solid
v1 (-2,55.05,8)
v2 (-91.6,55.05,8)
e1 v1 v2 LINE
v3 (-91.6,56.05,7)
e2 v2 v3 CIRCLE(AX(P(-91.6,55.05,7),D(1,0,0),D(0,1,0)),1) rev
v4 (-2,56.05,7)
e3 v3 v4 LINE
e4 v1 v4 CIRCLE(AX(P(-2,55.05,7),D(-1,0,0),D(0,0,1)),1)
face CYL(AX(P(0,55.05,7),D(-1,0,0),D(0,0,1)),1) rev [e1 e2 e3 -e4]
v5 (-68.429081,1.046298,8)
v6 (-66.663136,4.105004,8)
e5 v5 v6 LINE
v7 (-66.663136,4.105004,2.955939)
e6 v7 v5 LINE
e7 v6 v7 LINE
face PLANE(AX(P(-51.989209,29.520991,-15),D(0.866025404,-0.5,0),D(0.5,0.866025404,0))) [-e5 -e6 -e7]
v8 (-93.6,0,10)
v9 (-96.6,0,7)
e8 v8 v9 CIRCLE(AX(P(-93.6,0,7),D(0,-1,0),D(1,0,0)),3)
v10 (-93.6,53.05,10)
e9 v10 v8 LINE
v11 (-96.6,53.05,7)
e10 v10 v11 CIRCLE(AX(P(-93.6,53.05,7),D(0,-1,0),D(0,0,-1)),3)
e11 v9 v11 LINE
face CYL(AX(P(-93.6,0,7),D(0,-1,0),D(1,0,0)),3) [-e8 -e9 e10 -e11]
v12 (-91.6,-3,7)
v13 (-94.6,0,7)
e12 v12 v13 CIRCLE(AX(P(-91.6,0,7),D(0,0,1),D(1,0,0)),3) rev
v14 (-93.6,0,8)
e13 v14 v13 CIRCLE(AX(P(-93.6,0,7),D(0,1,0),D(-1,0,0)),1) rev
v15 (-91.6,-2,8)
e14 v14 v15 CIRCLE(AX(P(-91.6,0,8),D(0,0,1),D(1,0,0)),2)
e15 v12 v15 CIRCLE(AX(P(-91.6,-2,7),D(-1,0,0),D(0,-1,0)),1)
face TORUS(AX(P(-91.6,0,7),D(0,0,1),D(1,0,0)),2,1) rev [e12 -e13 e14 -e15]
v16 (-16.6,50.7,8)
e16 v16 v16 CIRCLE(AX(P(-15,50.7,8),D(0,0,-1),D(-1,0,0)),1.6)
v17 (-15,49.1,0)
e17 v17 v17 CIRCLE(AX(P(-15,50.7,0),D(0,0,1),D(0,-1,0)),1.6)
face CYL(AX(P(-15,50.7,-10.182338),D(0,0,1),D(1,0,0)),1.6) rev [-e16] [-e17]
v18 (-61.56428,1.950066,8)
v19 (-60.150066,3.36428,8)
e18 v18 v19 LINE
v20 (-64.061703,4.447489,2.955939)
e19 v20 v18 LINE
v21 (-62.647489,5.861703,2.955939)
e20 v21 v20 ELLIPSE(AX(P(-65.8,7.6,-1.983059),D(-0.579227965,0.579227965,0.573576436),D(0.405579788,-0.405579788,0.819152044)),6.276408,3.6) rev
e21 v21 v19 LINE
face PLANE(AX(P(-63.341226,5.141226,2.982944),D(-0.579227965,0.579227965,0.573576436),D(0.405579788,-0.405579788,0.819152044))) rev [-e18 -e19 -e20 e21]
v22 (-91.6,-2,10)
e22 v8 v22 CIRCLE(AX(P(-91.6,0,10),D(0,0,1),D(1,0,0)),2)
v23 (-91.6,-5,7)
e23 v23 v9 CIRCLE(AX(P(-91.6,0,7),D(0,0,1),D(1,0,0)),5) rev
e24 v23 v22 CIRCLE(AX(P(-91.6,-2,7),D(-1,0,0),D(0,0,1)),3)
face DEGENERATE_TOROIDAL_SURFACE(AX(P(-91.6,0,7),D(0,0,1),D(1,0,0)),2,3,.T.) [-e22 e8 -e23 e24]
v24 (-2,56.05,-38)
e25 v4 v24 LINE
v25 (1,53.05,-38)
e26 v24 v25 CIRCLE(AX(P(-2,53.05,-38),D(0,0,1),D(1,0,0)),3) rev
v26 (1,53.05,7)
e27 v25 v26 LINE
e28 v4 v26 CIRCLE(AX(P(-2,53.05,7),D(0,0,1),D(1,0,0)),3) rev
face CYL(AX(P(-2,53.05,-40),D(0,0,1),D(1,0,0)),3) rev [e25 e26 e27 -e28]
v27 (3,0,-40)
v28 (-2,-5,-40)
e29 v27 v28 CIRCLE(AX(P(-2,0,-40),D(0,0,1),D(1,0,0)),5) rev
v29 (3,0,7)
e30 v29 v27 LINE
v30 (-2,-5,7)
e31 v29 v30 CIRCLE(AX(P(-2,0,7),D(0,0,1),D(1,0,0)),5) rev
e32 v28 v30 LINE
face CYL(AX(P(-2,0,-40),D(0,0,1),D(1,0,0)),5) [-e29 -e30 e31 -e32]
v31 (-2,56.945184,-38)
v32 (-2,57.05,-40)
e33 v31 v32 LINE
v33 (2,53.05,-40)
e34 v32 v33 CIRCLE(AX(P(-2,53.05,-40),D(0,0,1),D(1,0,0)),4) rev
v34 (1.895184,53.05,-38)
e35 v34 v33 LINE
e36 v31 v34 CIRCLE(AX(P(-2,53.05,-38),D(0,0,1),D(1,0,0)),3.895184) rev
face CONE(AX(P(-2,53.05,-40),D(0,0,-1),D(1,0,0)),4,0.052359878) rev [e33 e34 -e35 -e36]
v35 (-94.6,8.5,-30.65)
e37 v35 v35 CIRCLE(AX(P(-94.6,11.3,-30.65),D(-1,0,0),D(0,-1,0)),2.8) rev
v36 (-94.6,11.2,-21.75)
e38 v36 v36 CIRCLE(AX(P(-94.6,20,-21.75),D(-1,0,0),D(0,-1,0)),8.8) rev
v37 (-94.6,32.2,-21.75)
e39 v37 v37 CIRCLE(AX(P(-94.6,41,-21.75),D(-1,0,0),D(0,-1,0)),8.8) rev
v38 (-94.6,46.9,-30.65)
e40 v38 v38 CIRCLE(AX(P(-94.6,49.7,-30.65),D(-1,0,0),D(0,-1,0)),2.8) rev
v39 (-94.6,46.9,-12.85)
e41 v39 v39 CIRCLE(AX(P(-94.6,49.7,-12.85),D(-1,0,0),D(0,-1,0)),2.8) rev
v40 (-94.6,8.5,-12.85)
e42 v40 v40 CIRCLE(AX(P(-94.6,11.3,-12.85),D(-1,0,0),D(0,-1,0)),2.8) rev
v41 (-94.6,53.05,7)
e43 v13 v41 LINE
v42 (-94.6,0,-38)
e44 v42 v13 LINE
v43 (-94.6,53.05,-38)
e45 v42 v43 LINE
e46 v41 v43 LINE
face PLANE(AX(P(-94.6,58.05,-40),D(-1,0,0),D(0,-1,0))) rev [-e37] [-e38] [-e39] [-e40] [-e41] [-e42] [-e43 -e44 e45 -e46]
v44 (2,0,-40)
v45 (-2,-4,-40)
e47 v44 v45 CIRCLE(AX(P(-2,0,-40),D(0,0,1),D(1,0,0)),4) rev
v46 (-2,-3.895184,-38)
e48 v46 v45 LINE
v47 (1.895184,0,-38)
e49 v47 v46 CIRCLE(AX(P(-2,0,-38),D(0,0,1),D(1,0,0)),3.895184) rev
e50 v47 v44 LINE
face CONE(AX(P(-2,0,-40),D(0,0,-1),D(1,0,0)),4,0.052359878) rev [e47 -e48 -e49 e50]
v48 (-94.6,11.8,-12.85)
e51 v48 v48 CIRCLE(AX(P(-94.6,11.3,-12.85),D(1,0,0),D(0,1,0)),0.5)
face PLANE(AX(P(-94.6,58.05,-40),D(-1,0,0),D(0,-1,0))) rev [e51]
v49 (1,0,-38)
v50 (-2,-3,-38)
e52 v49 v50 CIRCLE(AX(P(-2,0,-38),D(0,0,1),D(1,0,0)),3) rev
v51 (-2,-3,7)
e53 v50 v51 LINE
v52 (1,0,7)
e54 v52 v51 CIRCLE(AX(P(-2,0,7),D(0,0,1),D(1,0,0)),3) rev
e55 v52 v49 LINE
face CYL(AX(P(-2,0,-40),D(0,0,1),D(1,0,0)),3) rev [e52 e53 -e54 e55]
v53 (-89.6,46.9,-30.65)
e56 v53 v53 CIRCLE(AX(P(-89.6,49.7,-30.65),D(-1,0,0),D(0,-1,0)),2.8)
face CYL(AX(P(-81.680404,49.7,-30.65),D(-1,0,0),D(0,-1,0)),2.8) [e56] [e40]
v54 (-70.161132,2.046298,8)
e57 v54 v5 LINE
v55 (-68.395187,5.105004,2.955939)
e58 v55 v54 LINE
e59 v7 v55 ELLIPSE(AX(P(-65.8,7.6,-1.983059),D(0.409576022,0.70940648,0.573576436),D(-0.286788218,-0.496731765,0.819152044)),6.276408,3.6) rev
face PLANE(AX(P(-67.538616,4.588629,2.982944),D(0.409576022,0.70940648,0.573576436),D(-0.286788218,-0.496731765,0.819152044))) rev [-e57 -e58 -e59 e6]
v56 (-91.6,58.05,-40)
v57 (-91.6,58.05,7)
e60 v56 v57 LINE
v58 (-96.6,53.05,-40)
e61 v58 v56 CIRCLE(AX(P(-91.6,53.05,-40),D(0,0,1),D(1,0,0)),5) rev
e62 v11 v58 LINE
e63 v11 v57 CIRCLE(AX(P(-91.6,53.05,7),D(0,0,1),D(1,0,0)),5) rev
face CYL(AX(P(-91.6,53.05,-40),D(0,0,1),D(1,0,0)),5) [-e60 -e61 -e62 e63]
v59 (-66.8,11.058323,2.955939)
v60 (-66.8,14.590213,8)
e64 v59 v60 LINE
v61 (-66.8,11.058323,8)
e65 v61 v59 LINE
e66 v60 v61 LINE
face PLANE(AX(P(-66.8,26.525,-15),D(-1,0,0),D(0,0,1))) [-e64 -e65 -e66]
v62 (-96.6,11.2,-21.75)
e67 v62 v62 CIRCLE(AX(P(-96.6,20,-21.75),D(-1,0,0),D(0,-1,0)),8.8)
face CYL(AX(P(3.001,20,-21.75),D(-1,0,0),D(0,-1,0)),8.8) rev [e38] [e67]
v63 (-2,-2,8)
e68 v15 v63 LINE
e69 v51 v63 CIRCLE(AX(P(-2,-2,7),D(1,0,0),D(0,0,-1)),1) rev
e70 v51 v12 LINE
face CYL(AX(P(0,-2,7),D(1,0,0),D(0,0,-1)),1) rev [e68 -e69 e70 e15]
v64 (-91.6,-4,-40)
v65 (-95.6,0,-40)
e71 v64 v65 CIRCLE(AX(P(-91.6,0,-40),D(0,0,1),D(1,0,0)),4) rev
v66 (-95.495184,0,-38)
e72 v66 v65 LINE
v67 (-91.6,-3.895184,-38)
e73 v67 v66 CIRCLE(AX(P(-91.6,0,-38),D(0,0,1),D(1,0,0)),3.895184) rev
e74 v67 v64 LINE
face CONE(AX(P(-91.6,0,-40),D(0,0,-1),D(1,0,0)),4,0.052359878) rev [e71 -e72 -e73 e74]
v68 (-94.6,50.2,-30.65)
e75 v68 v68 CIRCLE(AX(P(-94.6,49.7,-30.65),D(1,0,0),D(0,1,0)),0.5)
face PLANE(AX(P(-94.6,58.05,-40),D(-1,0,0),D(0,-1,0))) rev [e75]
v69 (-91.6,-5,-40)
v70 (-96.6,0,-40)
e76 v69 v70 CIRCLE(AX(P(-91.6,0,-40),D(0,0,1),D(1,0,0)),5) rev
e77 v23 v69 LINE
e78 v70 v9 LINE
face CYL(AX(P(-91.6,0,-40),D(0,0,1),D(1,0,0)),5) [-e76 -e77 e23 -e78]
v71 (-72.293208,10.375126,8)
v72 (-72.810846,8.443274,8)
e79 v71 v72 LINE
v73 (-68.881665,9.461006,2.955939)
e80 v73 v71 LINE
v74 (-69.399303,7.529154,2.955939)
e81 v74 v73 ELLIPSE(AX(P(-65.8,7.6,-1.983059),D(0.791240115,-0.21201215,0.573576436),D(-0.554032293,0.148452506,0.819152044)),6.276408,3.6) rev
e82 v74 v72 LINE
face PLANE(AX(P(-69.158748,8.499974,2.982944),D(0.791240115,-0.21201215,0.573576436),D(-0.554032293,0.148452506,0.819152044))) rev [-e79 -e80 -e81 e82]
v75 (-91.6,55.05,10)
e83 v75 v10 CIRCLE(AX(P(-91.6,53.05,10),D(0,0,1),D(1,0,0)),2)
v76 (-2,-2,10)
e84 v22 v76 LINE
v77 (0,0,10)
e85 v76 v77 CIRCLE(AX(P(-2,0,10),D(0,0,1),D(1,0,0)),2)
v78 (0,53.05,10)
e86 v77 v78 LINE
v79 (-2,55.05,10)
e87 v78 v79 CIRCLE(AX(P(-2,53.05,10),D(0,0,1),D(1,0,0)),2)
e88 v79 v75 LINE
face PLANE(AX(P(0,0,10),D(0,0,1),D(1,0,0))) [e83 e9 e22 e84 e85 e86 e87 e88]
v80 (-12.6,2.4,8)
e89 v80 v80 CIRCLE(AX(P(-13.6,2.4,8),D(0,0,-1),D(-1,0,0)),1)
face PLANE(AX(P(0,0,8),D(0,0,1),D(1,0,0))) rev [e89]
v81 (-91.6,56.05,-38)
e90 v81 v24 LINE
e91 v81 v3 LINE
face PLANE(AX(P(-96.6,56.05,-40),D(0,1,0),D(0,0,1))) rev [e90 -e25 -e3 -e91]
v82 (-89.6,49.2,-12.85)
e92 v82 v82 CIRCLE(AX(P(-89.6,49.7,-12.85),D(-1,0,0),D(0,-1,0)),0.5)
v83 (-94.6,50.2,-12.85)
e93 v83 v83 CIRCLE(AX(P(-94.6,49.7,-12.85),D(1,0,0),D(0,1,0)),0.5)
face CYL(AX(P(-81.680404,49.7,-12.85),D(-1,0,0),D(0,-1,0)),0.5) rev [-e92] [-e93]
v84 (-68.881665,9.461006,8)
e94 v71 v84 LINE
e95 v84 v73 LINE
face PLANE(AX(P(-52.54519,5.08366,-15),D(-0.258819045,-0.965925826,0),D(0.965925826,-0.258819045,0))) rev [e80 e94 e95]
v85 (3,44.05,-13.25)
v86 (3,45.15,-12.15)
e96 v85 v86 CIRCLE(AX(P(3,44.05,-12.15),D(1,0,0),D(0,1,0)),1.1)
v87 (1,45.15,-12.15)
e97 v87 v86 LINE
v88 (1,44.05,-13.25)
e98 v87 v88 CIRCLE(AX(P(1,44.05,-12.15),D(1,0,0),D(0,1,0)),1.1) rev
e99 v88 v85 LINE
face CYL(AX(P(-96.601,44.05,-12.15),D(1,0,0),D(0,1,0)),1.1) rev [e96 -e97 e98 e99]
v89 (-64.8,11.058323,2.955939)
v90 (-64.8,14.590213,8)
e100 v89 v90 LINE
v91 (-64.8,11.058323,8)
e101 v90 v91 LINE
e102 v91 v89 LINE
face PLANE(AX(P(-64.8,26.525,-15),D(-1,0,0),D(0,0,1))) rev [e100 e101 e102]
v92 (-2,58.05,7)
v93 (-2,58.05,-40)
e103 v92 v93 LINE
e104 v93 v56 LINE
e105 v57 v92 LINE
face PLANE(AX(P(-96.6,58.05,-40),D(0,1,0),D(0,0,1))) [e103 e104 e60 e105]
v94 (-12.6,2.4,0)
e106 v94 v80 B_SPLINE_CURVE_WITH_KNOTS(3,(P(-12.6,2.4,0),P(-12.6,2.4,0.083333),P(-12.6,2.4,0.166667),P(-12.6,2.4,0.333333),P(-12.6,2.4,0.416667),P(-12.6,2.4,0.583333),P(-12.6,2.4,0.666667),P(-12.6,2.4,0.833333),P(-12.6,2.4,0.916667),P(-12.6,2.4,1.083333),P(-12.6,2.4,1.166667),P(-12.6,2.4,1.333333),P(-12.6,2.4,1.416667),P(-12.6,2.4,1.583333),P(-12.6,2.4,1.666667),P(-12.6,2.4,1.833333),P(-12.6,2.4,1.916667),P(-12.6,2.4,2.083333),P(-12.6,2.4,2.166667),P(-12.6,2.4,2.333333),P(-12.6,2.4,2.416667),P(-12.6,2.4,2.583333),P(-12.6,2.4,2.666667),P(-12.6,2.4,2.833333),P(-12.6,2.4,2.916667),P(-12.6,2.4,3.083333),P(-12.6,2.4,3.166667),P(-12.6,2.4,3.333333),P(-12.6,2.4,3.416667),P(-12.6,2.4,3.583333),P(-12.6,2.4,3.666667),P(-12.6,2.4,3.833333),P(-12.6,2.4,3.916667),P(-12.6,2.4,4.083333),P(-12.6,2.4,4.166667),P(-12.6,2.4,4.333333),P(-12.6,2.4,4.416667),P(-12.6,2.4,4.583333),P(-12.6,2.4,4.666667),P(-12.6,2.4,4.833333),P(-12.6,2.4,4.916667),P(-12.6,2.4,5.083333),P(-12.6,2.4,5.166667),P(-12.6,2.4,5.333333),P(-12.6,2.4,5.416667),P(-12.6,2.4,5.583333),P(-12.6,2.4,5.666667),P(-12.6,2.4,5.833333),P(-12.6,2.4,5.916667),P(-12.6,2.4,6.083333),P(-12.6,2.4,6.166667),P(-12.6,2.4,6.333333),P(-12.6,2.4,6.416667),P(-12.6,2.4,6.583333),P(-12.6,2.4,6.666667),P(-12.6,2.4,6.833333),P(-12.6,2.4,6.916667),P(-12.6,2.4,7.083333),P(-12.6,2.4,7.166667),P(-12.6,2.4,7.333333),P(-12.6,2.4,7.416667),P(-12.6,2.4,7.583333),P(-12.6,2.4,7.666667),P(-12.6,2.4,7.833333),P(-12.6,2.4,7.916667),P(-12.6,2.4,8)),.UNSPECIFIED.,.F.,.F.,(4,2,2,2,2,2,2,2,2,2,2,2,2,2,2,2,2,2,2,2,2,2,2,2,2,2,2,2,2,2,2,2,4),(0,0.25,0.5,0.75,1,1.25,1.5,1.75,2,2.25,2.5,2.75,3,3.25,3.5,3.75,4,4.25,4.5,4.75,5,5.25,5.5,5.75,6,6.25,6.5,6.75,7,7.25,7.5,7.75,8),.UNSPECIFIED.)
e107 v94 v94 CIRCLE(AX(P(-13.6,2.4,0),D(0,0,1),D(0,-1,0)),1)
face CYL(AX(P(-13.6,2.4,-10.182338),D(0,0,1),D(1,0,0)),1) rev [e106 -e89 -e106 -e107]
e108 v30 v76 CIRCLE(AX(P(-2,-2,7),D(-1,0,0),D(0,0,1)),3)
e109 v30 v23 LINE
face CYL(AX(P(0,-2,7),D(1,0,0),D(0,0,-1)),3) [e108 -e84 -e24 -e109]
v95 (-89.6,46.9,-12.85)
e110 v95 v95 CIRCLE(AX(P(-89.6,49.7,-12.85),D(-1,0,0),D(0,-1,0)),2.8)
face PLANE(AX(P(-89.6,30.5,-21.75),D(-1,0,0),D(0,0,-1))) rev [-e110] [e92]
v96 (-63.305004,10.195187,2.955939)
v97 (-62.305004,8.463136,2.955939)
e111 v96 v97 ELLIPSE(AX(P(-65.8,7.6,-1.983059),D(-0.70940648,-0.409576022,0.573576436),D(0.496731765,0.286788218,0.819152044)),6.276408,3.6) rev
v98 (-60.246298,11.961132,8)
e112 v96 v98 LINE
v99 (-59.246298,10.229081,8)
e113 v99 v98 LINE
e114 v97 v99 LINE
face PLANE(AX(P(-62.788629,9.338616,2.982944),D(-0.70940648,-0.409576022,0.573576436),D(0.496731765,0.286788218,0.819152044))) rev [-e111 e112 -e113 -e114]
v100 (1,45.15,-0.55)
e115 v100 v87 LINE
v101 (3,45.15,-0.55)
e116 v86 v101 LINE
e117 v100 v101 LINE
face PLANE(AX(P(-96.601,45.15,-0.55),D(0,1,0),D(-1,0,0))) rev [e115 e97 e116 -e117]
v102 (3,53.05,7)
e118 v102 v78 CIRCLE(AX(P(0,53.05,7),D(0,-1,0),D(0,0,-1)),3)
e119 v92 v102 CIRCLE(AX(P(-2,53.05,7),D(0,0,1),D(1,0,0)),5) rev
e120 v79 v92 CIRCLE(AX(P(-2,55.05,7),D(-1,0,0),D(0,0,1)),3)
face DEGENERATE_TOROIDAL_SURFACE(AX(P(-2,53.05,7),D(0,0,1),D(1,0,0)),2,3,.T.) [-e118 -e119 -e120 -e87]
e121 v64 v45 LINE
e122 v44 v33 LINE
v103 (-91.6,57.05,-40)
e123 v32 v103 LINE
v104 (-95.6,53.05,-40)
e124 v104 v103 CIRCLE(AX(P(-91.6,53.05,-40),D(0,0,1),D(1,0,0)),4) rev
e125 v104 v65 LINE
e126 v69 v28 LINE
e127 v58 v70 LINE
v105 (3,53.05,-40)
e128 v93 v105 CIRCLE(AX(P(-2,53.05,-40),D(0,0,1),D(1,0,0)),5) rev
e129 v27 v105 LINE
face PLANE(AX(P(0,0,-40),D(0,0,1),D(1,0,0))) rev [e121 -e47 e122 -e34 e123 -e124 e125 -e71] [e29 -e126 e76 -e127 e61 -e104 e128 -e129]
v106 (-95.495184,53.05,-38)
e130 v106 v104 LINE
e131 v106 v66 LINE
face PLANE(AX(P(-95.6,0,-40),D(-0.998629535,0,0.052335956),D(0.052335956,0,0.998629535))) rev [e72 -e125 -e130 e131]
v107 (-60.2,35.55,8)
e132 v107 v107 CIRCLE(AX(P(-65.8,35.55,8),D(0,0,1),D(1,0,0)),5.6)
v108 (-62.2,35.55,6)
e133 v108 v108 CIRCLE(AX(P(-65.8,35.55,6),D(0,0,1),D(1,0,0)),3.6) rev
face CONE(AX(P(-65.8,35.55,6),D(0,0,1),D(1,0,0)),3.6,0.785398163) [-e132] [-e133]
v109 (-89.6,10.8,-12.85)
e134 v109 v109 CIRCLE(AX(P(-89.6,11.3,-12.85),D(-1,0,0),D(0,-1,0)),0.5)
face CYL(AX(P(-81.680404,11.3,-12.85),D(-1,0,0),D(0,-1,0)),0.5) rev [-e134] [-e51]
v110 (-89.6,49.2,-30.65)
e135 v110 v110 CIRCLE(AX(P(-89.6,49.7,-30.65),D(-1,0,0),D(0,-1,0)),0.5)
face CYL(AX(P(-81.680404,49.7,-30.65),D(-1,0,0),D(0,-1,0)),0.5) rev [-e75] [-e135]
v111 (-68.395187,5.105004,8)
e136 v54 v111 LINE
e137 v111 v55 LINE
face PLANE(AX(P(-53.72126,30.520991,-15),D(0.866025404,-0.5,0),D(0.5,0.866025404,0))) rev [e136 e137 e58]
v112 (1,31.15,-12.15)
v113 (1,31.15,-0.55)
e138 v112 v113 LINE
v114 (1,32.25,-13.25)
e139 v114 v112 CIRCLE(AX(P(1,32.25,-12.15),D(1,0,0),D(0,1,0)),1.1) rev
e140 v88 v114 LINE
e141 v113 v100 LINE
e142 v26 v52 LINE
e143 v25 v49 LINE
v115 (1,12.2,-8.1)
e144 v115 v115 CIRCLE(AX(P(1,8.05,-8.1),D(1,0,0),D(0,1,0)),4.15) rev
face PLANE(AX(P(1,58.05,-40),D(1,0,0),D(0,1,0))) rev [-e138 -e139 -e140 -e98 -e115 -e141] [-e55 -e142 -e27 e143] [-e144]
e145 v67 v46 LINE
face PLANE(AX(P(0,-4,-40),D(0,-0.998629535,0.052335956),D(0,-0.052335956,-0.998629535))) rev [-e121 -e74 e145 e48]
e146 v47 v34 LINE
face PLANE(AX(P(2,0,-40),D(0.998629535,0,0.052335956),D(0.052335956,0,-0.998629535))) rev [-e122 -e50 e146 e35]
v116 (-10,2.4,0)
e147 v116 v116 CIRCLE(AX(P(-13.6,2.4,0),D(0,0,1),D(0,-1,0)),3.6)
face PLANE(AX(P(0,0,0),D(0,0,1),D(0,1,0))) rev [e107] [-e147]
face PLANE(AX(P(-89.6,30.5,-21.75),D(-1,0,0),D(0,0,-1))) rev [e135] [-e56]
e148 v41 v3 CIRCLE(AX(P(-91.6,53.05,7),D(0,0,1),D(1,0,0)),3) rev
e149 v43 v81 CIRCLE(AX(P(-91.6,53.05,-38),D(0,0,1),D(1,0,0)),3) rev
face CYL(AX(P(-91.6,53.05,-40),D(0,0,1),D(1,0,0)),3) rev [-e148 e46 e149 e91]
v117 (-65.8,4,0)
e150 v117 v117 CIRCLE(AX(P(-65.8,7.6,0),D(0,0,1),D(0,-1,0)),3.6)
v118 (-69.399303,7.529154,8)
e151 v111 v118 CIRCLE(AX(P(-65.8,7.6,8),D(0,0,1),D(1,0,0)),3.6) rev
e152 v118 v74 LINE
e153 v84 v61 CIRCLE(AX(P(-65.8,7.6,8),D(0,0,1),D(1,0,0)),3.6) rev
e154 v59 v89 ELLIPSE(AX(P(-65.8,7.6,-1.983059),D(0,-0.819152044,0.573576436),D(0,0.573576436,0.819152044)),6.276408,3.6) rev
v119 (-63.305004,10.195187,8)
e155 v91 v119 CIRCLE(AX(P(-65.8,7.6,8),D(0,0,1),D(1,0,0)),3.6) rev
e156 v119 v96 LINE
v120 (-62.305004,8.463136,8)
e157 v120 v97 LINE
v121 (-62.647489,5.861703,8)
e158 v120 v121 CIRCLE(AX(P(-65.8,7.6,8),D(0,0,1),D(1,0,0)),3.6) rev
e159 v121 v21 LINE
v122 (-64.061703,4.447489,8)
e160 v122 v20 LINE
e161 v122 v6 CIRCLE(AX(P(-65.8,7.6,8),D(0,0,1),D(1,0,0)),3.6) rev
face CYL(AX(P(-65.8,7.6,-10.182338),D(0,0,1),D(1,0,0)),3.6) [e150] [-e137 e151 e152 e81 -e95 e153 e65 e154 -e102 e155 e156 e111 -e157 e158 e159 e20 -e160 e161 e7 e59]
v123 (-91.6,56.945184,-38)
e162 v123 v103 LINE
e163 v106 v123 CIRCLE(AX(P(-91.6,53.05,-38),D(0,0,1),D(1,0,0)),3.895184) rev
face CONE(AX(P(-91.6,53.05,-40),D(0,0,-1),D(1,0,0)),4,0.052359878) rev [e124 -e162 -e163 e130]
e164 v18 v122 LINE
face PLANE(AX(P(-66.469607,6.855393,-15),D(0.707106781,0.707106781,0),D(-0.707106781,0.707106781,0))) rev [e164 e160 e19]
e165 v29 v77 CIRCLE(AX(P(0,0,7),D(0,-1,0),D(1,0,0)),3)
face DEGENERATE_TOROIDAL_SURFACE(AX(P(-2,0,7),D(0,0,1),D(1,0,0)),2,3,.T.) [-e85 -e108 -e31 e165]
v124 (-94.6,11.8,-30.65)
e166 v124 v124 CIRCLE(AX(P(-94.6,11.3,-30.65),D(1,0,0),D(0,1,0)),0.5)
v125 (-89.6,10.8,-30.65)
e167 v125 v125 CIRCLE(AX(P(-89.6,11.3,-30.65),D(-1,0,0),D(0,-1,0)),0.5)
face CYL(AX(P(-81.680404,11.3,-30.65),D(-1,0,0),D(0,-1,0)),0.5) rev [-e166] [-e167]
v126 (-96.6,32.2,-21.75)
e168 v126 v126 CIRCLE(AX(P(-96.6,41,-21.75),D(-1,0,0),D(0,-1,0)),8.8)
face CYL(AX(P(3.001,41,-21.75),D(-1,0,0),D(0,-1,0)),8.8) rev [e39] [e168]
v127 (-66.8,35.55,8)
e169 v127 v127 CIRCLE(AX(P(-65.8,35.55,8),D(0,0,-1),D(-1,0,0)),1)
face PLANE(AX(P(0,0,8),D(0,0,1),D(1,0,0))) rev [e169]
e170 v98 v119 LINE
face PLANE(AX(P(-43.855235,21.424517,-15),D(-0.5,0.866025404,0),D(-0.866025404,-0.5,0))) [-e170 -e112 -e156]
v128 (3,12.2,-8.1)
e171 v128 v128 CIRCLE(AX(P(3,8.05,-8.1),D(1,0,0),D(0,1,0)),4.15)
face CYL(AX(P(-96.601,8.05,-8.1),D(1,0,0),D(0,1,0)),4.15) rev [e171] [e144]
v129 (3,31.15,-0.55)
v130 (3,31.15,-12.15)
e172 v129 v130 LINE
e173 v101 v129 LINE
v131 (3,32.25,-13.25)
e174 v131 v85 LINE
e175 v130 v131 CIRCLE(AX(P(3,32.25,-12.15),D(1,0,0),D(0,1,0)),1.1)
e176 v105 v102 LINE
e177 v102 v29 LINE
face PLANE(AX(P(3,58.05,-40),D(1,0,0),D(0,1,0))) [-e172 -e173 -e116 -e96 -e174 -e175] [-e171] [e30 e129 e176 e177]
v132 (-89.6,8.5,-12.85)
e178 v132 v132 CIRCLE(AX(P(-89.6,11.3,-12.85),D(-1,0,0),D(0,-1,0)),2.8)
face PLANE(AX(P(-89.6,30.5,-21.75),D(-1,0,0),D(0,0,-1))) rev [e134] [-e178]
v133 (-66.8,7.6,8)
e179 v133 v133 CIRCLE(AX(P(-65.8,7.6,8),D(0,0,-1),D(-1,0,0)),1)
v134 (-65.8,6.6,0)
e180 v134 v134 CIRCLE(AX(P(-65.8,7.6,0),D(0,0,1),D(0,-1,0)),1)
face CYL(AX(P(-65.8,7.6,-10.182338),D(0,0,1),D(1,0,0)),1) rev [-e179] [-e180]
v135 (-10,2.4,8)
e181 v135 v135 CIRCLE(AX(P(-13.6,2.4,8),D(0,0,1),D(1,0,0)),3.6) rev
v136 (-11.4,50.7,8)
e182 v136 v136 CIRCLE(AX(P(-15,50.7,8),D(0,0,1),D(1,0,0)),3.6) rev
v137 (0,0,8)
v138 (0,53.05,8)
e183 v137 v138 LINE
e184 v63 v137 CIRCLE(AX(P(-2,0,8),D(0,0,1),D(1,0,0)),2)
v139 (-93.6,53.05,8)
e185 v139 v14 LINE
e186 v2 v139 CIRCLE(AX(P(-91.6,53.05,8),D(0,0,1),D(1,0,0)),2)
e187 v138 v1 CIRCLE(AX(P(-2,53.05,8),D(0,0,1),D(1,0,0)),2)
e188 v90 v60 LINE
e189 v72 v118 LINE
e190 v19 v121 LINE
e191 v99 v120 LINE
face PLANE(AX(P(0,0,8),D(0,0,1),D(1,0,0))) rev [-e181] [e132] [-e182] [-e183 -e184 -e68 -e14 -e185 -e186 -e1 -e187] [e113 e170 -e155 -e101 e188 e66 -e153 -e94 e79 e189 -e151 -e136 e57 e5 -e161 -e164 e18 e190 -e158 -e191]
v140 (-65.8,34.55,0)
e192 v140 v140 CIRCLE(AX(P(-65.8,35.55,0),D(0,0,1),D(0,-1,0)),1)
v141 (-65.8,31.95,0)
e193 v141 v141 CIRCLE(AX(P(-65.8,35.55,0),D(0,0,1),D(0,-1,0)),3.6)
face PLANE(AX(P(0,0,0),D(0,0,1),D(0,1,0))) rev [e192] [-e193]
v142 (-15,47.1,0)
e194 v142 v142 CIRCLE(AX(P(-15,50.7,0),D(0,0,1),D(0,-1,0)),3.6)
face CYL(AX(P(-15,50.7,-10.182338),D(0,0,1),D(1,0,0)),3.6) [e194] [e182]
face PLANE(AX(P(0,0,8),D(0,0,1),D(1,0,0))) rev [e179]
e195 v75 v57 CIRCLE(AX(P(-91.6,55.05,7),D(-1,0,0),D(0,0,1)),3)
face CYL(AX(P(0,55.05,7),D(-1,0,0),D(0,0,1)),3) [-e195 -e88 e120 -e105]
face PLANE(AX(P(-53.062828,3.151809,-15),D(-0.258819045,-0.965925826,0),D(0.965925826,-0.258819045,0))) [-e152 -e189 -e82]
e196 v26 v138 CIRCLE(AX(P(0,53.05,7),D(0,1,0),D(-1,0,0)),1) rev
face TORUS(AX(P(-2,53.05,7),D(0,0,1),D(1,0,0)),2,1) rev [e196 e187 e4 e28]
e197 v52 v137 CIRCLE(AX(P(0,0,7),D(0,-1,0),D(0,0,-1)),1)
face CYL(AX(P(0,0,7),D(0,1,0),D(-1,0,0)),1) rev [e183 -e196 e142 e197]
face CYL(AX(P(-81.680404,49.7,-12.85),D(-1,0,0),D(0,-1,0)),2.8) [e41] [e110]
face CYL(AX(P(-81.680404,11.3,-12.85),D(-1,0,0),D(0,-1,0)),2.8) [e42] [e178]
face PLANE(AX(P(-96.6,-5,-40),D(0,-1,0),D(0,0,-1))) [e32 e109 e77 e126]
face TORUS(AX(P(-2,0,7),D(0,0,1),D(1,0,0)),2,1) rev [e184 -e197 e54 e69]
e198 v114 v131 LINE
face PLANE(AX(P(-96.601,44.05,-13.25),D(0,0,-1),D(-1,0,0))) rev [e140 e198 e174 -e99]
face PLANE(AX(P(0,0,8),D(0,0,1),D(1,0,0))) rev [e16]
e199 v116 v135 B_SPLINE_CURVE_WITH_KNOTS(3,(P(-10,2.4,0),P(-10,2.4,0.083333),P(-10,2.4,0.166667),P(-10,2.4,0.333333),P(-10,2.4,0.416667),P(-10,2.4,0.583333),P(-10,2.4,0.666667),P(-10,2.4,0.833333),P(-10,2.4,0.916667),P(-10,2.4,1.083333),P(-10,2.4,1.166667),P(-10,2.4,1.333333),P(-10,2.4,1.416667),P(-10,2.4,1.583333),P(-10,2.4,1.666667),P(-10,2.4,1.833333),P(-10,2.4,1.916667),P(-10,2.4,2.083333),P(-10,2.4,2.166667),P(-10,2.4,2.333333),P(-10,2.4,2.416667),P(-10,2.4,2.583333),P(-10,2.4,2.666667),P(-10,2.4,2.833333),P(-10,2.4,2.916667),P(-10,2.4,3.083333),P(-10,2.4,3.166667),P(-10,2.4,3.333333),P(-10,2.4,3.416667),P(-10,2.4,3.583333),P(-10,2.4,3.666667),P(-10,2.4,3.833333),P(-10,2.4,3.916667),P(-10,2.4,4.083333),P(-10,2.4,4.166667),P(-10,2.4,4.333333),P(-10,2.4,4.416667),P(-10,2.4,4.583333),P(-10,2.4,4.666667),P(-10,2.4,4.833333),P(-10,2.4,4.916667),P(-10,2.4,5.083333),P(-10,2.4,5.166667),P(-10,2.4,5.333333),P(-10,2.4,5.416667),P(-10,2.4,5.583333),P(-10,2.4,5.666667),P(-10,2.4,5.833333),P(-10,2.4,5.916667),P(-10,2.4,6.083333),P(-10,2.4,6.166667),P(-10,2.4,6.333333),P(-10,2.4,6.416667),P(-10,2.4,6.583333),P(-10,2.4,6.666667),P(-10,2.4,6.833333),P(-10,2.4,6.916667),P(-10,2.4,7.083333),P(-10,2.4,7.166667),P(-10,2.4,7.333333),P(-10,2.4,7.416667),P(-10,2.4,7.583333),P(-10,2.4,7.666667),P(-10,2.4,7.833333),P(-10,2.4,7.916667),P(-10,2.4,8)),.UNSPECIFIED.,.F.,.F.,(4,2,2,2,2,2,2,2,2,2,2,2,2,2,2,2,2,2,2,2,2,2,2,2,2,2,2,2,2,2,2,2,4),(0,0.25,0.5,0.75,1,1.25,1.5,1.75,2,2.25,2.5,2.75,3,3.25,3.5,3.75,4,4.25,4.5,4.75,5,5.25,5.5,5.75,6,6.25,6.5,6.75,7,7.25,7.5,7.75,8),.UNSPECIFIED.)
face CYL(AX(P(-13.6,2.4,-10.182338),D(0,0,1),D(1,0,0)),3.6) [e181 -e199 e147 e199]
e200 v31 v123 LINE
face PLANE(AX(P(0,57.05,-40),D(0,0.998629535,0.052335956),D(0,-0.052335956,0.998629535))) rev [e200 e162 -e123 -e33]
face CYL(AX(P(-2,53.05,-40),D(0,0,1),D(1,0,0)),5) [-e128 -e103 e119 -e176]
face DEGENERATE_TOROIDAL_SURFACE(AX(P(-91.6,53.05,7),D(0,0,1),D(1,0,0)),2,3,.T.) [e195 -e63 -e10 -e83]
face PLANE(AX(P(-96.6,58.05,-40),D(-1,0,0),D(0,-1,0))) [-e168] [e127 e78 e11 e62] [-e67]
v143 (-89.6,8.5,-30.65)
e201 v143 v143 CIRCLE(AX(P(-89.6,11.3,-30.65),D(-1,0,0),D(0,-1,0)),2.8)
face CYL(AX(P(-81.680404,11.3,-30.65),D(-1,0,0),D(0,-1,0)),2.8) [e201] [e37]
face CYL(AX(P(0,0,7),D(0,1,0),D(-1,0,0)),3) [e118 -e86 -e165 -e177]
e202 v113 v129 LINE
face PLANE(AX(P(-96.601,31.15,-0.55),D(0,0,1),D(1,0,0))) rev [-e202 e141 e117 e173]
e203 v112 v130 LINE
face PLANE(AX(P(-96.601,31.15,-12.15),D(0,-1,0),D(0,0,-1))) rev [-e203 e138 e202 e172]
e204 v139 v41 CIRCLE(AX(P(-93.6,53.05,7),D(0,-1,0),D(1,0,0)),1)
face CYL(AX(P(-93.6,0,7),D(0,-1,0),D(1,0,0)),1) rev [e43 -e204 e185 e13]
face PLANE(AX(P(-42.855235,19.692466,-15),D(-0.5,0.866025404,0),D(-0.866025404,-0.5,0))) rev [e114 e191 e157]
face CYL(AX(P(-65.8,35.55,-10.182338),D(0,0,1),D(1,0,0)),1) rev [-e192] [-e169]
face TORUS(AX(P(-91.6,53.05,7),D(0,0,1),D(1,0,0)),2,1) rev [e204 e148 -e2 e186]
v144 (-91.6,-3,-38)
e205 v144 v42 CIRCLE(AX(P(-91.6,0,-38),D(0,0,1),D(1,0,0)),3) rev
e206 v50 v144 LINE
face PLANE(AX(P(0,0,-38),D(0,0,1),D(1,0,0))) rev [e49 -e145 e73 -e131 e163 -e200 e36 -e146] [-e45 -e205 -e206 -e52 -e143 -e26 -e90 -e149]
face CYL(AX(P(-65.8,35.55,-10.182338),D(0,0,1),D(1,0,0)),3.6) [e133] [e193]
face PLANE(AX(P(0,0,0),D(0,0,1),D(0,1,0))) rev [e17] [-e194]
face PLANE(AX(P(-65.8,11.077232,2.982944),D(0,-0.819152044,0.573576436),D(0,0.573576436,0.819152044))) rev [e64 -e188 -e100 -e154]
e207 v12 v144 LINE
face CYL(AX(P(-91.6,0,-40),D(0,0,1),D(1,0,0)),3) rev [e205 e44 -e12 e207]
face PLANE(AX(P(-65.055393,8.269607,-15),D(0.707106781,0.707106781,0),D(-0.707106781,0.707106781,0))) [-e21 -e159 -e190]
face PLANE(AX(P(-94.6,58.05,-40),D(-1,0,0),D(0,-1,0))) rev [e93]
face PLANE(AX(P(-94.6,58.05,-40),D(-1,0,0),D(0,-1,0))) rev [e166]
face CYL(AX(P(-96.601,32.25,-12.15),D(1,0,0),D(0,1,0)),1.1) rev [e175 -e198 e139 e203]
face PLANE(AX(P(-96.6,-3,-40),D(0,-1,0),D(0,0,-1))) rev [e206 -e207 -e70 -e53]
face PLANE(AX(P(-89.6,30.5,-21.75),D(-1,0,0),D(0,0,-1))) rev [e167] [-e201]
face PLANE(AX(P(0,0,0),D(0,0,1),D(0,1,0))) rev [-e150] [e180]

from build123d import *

# Parameters (mm, degrees)
SKETCH2_W           = 99.6
SKETCH2_H           = 63.05
BOSS_EXTRUDE2_DEPTH = 50
FILLET1_R           = 5
FILLET2_R           = 3
SHELL3_T            = -2
CUT_EXTRUDE6_REACH  = 124.024
SKETCH40_R          = 8.8
CUT_EXTRUDE7_REACH  = 124.024
CUT_EXTRUDE8_REACH  = 124.024
SKETCH42_R          = 4.15
SKETCH43_R          = 3.6
SKETCH43_R_2        = 1
BOSS_EXTRUDE3_DEPTH = 8
SKETCH44_R          = 3.6
SKETCH44_R_2        = 1
BOSS_EXTRUDE4_DEPTH = 8
SKETCH45_R          = 3.6
SKETCH45_R_2        = 1
BOSS_EXTRUDE5_DEPTH = 8
SKETCH46_R          = 3.6
SKETCH46_R_2        = 1.6
BOSS_EXTRUDE6_DEPTH = 8
GROOVE1_DEPTH       = 2
GROOVE1_DRAFT       = 3
SKETCH47_R          = 2.8
SKETCH47_R_2        = 0.5
BOSS_EXTRUDE7_DEPTH = 5
CHAMFER1_SIZE       = 2
RIB1_REACH          = 100.505
SKETCH48_WALL_W     = 202.293959528
SKETCH48_WALL_H     = 2
CIRPATTERN1_COUNT   = 5
CIRPATTERN1_ANGLE   = 300


# Read off the part's stored shape, not the designer's step: Groove1
with BuildPart() as part:
    # Sketch2 → Boss-Extrude2 (new body)
    with BuildSketch(Plane.XY.offset(10)):
        with Locations((-46.8, 26.525)):
            Rectangle(SKETCH2_W, SKETCH2_H)
    extrude(amount=-BOSS_EXTRUDE2_DEPTH)

    # Fillet1
    fillet1_edges = [part.edges().sort_by_distance(p)[0] for p in [
        (-96.6, 58.05, -15),
        (3, 58.05, -15),
        (3, -5, -15),
        (-96.6, -5, -15),
    ]]
    fillet(fillet1_edges, radius=FILLET1_R)

    # Fillet2
    fillet2_edges = [part.edges().sort_by_distance(p)[0] for p in [
        (-46.8, -5, 10),
        (-96.6, 26.525, 10),
        (3, 26.525, 10),
        (-46.8, 58.05, 10),
        (-95.135533906, 56.585533906, 10),
        (-95.135533906, -3.535533906, 10),
        (1.535533906, 56.585533906, 10),
        (1.535533906, -3.535533906, 10),
    ]]
    fillet(fillet2_edges, radius=FILLET2_R)

    # Shell3
    shell3_openings = [part.faces().sort_by_distance(p)[0] for p in [
        (-46.8, 26.525, -40),
    ]]
    offset(amount=SHELL3_T, openings=shell3_openings, kind=Kind.INTERSECTION)

    # Sketch40 → Cut-Extrude6 (cut, up to next)
    with BuildSketch(Plane.ZY.offset(96.6), mode=Mode.PRIVATE) as cut_extrude6_sk1:
        with Locations(Location((-21.75, 20, 0), (0, 0, 270))):
            Circle(SKETCH40_R)
    cut_extrude6_tool1 = extrude(cut_extrude6_sk1.sketch, amount=-CUT_EXTRUDE6_REACH, mode=Mode.PRIVATE) & part.part
    # Sketch40 → Cut-Extrude6 (cut, up to next)
    with BuildSketch(Plane.ZY.offset(96.6), mode=Mode.PRIVATE) as cut_extrude6_sk2:
        with Locations(Location((-21.75, 41, 0), (0, 0, 270))):
            Circle(SKETCH40_R)
    cut_extrude6_tool2 = extrude(cut_extrude6_sk2.sketch, amount=-CUT_EXTRUDE6_REACH, mode=Mode.PRIVATE) & part.part
    add(cut_extrude6_tool1.solids().sort_by_distance((-96.6, 20, -21.75))[0], mode=Mode.SUBTRACT)
    add(cut_extrude6_tool2.solids().sort_by_distance((-96.6, 41, -21.75))[0], mode=Mode.SUBTRACT)

    # Sketch41 → Cut-Extrude7 (cut, up to next)
    with BuildSketch(Plane(origin=(3, 0, 0), x_dir=(0, 0, -1), z_dir=(1, 0, 0)), mode=Mode.PRIVATE) as cut_extrude7_sk1:
        with BuildLine():
            Line((0.55, 31.15), (0.55, 45.15))
            Line((0.55, 45.15), (12.15, 45.15))
            ThreePointArc((12.15, 45.15), (12.927817459, 44.827817459), (13.25, 44.05))
            Line((13.25, 44.05), (13.25, 32.25))
            ThreePointArc((13.25, 32.25), (12.927817459, 31.472182541), (12.15, 31.15))
            Line((12.15, 31.15), (0.55, 31.15))
        make_face()
    cut_extrude7_tool1 = extrude(cut_extrude7_sk1.sketch, amount=-CUT_EXTRUDE7_REACH, mode=Mode.PRIVATE) & part.part
    add(cut_extrude7_tool1.solids().sort_by_distance((3, 38.15, -6.882118))[0], mode=Mode.SUBTRACT)

    # Sketch42 → Cut-Extrude8 (cut, up to next)
    with BuildSketch(Plane(origin=(3, 0, 0), x_dir=(0, 0, -1), z_dir=(1, 0, 0)), mode=Mode.PRIVATE) as cut_extrude8_sk1:
        with Locations(Location((8.1, 8.05, 0), (0, 0, 90))):
            Circle(SKETCH42_R)
    cut_extrude8_tool1 = extrude(cut_extrude8_sk1.sketch, amount=-CUT_EXTRUDE8_REACH, mode=Mode.PRIVATE) & part.part
    add(cut_extrude8_tool1.solids().sort_by_distance((3, 8.05, -8.1))[0], mode=Mode.SUBTRACT)

    # Sketch43 → Boss-Extrude3 (add)
    with BuildSketch(Plane(origin=(0, 0, 8), x_dir=(-1, 0, 0), z_dir=(0, 0, -1))):
        with Locations(Location((65.8, 7.6, 0), (0, 0, 180))):
            Circle(SKETCH43_R)
        with Locations(Location((65.8, 7.6, 0), (0, 0, 270))):
            Circle(SKETCH43_R_2, mode=Mode.SUBTRACT)
    extrude(amount=BOSS_EXTRUDE3_DEPTH)

    # Sketch44 → Boss-Extrude4 (add)
    with BuildSketch(Plane(origin=(0, 0, 8), x_dir=(-1, 0, 0), z_dir=(0, 0, -1))):
        with Locations(Location((65.8, 35.55, 0), (0, 0, 180))):
            Circle(SKETCH44_R)
        with Locations(Location((65.8, 35.55, 0), (0, 0, 270))):
            Circle(SKETCH44_R_2, mode=Mode.SUBTRACT)
    extrude(amount=BOSS_EXTRUDE4_DEPTH)

    # Sketch45 → Boss-Extrude5 (add)
    with BuildSketch(Plane(origin=(0, 0, 8), x_dir=(-1, 0, 0), z_dir=(0, 0, -1))):
        with Locations(Location((13.6, 2.4, 0), (0, 0, 180))):
            Circle(SKETCH45_R)
        with Locations(Location((13.6, 2.4, 0), (0, 0, 180))):
            Circle(SKETCH45_R_2, mode=Mode.SUBTRACT)
    extrude(amount=BOSS_EXTRUDE5_DEPTH)

    # Sketch46 → Boss-Extrude6 (add)
    with BuildSketch(Plane(origin=(0, 0, 8), x_dir=(-1, 0, 0), z_dir=(0, 0, -1))):
        with Locations(Location((15, 50.7, 0), (0, 0, 180))):
            Circle(SKETCH46_R)
        with Locations(Location((15, 50.7, 0), (0, 0, 270))):
            Circle(SKETCH46_R_2, mode=Mode.SUBTRACT)
    extrude(amount=BOSS_EXTRUDE6_DEPTH)


with BuildPart() as groove1_tool:
    # Groove1 outline → Groove1 (with draft: the straight prism first)
    with BuildSketch(Plane.XY.offset(-38)):
        with BuildLine():
            ThreePointArc((-2, -3.895184441), (0.754311333, -2.754311333), (1.895184441, 0))
            Line((1.895184441, 0), (1.895184441, 53.05))
            ThreePointArc((1.895184441, 53.05), (0.754311333, 55.804311333), (-2, 56.945184441))
            Line((-2, 56.945184441), (-91.6, 56.945184441))
            ThreePointArc((-91.6, 56.945184441), (-94.354311333, 55.804311333), (-95.495184441, 53.05))
            Line((-95.495184441, 53.05), (-95.495184441, 0))
            ThreePointArc((-95.495184441, 0), (-94.354311333, -2.754311333), (-91.6, -3.895184441))
            Line((-91.6, -3.895184441), (-2, -3.895184441))
        make_face()
        with BuildLine():
            Line((1, 0), (1, 53.05))
            ThreePointArc((1, 53.05), (0.121320344, 55.171320344), (-2, 56.05))
            Line((-2, 56.05), (-91.6, 56.05))
            ThreePointArc((-91.6, 56.05), (-93.721320344, 55.171320344), (-94.6, 53.05))
            Line((-94.6, 53.05), (-94.6, 0))
            ThreePointArc((-94.6, 0), (-93.721320344, -2.121320344), (-91.6, -3))
            Line((-91.6, -3), (-2, -3))
            ThreePointArc((-2, -3), (0.121320344, -2.121320344), (1, 0))
        make_face(mode=Mode.SUBTRACT)
    extrude(amount=-GROOVE1_DEPTH)
    # Groove1: the draft: its side faces are tilted about the plane it starts from
    groove1_sides = [groove1_tool.faces().sort_by_distance(p)[0] for p in [
        (-46.8, -3.895184441, -39),
        (0.754311333, -2.754311333, -39),
        (1.895184441, 26.525, -39),
        (0.754311333, 55.804311333, -39),
        (-46.8, 56.945184441, -39),
        (-94.354311333, 55.804311333, -39),
        (-95.495184441, 26.525, -39),
        (-94.354311333, -2.754311333, -39),
        (-93.721320344, -2.121320344, -39),
        (-94.6, 26.525, -39),
        (-93.721320344, 55.171320344, -39),
        (-46.8, 56.05, -39),
        (0.121320344, 55.171320344, -39),
        (1, 26.525, -39),
        (0.121320344, -2.121320344, -39),
        (-46.8, -3, -39),
    ]]
    draft(groove1_sides, Plane.XY.offset(-38), GROOVE1_DRAFT)


with BuildPart() as part_1:
    add(part.part)

    # Groove1: cut by groove1_tool
    add(groove1_tool.part, mode=Mode.SUBTRACT)

    # Sketch47 → Boss-Extrude7 (add)
    # profile 1 of 4: a face of its own
    with BuildSketch(Plane(origin=(-94.6, 0, 0), x_dir=(0, 0, -1), z_dir=(1, 0, 0))):
        with Locations(Location((30.65, 11.3, 0), (0, 0, 270))):
            Circle(SKETCH47_R)
        with Locations(Location((30.65, 11.3, 0), (0, 0, 270))):
            Circle(SKETCH47_R_2, mode=Mode.SUBTRACT)
    # profile 2 of 4: a face of its own
    with BuildSketch(Plane(origin=(-94.6, 0, 0), x_dir=(0, 0, -1), z_dir=(1, 0, 0))):
        with Locations(Location((12.85, 11.3, 0), (0, 0, 270))):
            Circle(SKETCH47_R)
        with Locations(Location((12.85, 11.3, 0), (0, 0, 270))):
            Circle(SKETCH47_R_2, mode=Mode.SUBTRACT)
    # profile 3 of 4: a face of its own
    with BuildSketch(Plane(origin=(-94.6, 0, 0), x_dir=(0, 0, -1), z_dir=(1, 0, 0))):
        with Locations(Location((12.85, 49.7, 0), (0, 0, 270))):
            Circle(SKETCH47_R)
        with Locations(Location((12.85, 49.7, 0), (0, 0, 270))):
            Circle(SKETCH47_R_2, mode=Mode.SUBTRACT)
    # profile 4 of 4: a face of its own
    with BuildSketch(Plane(origin=(-94.6, 0, 0), x_dir=(0, 0, -1), z_dir=(1, 0, 0))):
        with Locations(Location((30.65, 49.7, 0), (0, 0, 270))):
            Circle(SKETCH47_R)
        with Locations(Location((30.65, 49.7, 0), (0, 0, 270))):
            Circle(SKETCH47_R_2, mode=Mode.SUBTRACT)
    extrude(amount=BOSS_EXTRUDE7_DEPTH)

    # Chamfer1
    chamfer1_edges = [part_1.edges().sort_by_distance(p)[0] for p in [
        (-69.4, 35.55, 8),
    ]]
    chamfer(chamfer1_edges, length=CHAMFER1_SIZE)

    # Sketch48 wall → Rib1 (add, up to next)
    with BuildSketch(Plane(origin=(-65.8, 12.019011316, 4.327943694), x_dir=(0, 0.573576436395, 0.819152044258), z_dir=(0, 0.819152044258, -0.573576436395)), mode=Mode.PRIVATE) as rib1_sk1:
        Rectangle(SKETCH48_WALL_W, SKETCH48_WALL_H)
    rib1_tool1 = extrude(rib1_sk1.sketch, amount=-RIB1_REACH, mode=Mode.PRIVATE) - part_1.part
    rib1 = rib1_tool1.solids().sort_by_distance((-65.8, 12.019011316, 4.327943694))[0]
    add(rib1)

    # CirPattern1: Rib1 ×5 about axis
    cirpattern1_axis = Axis((-65.8, 7.6, 0), (0, 0, 1))
    for i in range(1, CIRPATTERN1_COUNT):
        add(rib1.rotate(cirpattern1_axis, i * CIRPATTERN1_ANGLE / (CIRPATTERN1_COUNT - 1)))


solid = part_1.part
